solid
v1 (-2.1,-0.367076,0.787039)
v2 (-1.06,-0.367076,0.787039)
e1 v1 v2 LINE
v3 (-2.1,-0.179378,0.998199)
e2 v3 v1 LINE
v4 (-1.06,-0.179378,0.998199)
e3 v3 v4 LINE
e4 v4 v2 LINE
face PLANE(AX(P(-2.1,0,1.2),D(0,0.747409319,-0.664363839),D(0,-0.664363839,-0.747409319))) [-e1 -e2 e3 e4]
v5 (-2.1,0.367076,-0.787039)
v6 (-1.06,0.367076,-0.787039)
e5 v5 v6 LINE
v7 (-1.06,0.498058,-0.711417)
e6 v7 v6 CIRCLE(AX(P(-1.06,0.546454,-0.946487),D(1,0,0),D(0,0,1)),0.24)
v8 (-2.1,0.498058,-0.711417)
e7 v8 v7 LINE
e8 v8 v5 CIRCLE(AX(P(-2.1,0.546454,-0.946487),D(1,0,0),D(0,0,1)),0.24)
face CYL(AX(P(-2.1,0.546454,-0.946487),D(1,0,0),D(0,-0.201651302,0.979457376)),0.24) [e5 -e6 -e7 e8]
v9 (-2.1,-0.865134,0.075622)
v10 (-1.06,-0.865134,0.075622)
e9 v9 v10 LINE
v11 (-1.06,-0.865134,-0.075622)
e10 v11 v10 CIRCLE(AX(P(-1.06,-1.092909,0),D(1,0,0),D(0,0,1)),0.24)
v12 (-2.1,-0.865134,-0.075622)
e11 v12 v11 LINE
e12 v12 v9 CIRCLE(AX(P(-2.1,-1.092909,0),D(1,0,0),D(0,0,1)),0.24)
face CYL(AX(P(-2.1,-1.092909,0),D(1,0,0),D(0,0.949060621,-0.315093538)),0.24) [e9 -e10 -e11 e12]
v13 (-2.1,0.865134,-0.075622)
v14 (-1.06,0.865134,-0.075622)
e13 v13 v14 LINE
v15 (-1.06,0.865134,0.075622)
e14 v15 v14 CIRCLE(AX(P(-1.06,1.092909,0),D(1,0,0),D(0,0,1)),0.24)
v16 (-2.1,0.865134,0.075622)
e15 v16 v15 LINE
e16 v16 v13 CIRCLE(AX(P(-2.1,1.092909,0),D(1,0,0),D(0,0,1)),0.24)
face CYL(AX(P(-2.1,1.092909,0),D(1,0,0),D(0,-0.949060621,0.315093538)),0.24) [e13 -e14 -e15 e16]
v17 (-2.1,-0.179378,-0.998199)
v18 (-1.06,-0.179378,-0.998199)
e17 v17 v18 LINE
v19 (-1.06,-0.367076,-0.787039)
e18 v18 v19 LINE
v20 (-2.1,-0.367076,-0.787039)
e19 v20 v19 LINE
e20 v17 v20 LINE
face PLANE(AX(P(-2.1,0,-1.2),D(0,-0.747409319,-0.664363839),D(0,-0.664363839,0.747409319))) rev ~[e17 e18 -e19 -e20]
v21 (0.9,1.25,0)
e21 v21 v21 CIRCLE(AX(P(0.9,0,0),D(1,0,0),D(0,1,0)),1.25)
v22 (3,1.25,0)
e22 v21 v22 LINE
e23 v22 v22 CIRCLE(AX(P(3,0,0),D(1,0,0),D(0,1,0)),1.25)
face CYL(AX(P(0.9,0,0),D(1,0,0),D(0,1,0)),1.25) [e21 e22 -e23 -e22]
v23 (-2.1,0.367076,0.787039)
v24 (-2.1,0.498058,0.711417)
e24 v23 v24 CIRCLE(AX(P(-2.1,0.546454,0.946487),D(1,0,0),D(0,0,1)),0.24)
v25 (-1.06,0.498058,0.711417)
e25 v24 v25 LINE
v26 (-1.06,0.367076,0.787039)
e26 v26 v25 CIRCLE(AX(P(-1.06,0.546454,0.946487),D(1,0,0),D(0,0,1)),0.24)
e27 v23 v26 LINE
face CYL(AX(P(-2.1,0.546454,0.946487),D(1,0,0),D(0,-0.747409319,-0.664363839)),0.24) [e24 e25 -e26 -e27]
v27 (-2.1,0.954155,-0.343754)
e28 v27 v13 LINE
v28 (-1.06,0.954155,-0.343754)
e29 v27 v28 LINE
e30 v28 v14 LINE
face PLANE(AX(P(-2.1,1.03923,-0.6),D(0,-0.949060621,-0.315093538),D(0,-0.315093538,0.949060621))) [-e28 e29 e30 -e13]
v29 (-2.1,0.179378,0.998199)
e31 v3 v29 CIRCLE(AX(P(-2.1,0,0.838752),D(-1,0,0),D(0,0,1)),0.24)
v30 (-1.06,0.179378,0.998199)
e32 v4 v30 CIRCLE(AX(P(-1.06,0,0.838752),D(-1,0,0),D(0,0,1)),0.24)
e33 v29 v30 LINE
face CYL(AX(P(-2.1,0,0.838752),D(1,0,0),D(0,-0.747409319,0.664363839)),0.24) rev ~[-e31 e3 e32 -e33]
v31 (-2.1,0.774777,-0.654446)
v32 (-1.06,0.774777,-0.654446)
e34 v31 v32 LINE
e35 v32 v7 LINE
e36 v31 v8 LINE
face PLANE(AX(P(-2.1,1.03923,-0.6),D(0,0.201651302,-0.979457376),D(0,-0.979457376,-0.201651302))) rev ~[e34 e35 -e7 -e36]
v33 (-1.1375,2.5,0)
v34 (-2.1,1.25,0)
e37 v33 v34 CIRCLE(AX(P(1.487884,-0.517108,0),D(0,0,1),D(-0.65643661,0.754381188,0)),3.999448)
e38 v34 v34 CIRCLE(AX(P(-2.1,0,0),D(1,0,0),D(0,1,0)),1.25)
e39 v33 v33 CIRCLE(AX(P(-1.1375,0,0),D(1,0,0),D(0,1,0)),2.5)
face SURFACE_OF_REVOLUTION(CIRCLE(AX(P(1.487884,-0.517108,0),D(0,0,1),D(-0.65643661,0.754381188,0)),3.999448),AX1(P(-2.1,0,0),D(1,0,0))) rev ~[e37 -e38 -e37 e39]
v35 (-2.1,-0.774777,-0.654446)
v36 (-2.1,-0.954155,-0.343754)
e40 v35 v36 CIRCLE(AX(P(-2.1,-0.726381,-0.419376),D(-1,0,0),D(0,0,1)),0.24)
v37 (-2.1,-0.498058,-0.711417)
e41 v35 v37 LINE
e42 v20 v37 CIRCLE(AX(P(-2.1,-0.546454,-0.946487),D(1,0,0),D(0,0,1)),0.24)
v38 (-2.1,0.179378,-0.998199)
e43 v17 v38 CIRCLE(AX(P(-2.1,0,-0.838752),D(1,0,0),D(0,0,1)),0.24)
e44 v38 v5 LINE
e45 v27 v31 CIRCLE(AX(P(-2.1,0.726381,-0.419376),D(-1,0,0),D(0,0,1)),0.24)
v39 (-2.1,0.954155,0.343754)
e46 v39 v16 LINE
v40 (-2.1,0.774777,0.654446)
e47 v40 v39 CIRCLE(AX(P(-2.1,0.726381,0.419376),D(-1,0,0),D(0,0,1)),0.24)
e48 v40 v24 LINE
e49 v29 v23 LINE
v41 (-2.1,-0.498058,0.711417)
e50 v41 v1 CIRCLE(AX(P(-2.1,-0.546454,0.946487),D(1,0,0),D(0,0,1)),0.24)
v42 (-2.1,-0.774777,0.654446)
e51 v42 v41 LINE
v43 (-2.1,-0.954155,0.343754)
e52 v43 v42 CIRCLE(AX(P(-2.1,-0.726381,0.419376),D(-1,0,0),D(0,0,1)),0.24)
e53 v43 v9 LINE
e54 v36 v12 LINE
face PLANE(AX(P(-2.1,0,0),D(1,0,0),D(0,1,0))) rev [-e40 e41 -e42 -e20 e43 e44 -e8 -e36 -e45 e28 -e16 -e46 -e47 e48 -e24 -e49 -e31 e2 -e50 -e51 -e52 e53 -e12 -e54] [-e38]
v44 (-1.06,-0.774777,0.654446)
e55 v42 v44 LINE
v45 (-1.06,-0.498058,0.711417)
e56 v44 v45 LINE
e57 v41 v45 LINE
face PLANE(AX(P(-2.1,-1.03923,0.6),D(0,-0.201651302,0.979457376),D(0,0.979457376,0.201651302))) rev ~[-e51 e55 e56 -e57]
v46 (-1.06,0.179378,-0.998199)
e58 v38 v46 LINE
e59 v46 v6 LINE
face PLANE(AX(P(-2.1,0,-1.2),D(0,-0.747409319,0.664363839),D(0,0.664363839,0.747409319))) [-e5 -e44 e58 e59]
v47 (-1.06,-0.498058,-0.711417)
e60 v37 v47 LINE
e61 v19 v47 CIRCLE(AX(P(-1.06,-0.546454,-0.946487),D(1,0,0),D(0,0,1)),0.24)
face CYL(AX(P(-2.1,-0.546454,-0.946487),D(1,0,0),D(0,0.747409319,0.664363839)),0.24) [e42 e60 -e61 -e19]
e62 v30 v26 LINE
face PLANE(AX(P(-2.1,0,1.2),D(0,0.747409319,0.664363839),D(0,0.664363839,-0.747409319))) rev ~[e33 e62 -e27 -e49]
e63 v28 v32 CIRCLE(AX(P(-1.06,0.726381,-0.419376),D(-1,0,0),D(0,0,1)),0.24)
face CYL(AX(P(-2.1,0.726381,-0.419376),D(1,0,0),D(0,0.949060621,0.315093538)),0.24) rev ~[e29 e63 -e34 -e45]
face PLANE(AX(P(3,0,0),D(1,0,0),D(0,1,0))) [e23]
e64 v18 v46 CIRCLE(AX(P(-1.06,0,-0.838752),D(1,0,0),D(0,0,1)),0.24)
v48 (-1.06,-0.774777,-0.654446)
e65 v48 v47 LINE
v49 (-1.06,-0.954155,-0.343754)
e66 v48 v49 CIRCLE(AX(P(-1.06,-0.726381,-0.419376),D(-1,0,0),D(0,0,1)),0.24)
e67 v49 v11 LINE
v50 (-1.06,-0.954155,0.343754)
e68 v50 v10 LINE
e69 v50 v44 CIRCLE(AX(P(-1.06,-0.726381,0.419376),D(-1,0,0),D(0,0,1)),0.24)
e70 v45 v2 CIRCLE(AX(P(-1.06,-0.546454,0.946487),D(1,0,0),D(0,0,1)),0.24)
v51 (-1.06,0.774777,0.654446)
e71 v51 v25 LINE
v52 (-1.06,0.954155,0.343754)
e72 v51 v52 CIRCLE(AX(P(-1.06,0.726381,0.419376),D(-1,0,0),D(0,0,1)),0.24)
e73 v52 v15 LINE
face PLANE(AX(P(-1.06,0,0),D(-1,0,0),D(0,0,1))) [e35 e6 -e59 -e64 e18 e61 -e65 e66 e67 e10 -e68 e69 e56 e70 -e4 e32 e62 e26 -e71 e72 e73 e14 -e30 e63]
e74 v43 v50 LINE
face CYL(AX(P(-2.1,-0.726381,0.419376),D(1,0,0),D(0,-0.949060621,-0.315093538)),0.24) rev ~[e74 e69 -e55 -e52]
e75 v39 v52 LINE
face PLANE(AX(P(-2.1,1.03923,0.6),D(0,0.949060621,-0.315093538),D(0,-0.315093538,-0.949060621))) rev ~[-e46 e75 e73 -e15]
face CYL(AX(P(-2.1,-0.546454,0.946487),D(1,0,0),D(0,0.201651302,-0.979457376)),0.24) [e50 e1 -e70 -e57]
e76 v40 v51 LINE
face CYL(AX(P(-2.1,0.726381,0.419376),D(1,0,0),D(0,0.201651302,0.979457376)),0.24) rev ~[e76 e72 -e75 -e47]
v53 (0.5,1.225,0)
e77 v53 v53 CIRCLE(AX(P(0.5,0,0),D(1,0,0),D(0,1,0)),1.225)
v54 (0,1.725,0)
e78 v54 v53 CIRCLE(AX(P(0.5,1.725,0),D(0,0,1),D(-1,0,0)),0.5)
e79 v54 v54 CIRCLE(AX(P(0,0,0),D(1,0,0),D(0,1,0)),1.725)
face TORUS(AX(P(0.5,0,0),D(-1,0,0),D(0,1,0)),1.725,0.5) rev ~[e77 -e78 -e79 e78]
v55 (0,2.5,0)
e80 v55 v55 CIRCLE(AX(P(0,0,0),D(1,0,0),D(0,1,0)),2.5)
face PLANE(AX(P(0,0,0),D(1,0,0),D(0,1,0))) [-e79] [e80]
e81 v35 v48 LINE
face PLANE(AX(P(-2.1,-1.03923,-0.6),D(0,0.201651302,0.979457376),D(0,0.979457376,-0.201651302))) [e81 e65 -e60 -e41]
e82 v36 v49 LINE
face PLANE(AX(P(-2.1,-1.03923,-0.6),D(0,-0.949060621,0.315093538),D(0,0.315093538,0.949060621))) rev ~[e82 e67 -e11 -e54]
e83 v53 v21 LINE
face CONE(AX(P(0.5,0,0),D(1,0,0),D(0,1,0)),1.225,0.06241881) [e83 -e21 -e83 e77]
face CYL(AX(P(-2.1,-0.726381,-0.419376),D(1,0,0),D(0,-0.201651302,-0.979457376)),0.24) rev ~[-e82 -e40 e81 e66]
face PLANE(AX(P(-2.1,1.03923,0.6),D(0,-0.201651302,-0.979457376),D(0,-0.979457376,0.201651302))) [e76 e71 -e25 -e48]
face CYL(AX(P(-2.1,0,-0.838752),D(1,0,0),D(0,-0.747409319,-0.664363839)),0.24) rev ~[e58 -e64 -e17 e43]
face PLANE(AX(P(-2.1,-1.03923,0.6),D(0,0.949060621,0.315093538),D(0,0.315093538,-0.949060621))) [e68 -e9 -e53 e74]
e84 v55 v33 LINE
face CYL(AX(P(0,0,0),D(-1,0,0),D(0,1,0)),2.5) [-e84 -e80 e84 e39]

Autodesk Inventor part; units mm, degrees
ref_plane "YZ Plane" through (0, 0, 0) normal (1, 0, 0) x (0, 1, 0)
ref_plane "XZ Plane" through (0, 0, 0) normal (0, 1, 0) x (-1, 0, 0)
ref_plane "XY Plane" through (0, 0, 0) normal (0, 0, 1) x (1, 0, 0)
sketch "Sketch4" plane through (0, 0, 0) normal (0, 0, 1) x (1, 0, 0)
  line L0 (-2.1, 0) -> (3, 0)
  line L1 (0, 0) -> (-2.1, 0)
  line L2 (0, 2.5) -> (0, 1.725)
  line L3 (0.5, 1.225) -> (0.5, 1.225)
  line L4 (0.5, 1.225) -> (0.9, 1.25)
  arc A0 (0, 1.725) -> (0.5, 1.225) centre (0.5, 1.725) ccw
  line L5 (-2.1, 0) -> (-2.1, 1.25)
  line L6 (0, 2.5) -> (-1.1375, 2.5)
  arc A1 (-1.1375, 2.5) -> (-2.1, 1.25) centre (1.4883, -0.5175) ccw
  line L7 (0.9, 1.25) -> (3, 1.25)
  line L8 (3, 1.25) -> (3, 0)
  point P0 (0, 1.225)
  dimension "d71" = 0.5
  dimension "d72" = 3
  dimension "d74" = 0.4
  dimension "d75" = 2.45
  dimension "d78" = 2.5
  dimension "d82" = 4
  dimension "d83" = 2.1
  dimension "d84" = 5
  dimension "d104" = 2.1
  dimension "d105" = 2.5
revolve "Revolution7" add sketch "Sketch4" angle 360 about axis through (-2.1, 0, 0) along (1, 0, 0)
sketch "Sketch5" plane through (-2.1, 0, 0) normal (-1, 0, 0) x (0, 0, 1)
  circle A0 centre (0, 0) radius 1.2 construction
  circle A1 centre (0, 0) radius 0.84 construction
  line L0 (0, 0) -> (-0.7275, 0.42)
  line L1 (0, 0) -> (-0.7275, -0.42)
  line L2 (-1.8008, 0) -> (1.7887, 0)
  line L3 (-1.2, 0) -> (-0.7275, -0.42)
  line L4 (-1.2, 0) -> (-0.7275, 0.42)
  dimension "d88" = 2.4
  dimension "d89" = 1.68
  dimension "d90" = 30
  dimension "d91" = 30
extrude "Extrusion1" cut sketch "Sketch5" against normal blind 1.04
pattern_circular "Circular Pattern1" count 6 over 360 about axis through (-10, 0, 0) along (1, 0, 0) of "Extrusion1"
fillet "Fillet1" radius 0.24 12 edges at (-1.58, -1.0392, -0.6) (-1.58, -0.42, -0.7275) (-1.58, -0.84, 0) (-1.58, -1.0392, 0.6) (-1.58, -0.42, 0.7275) (-1.58, 0, 1.2) (-1.58, 0.84, 0) (-1.58, 1.0392, 0.6) (-1.58, 0.42, 0.7275) (-1.58, 0.42, -0.7275) (-1.58, 0, -1.2) (-1.58, 1.0392, -0.6)
thread "Thread7" size "M2.5x0.45" class "6g" standard "ISO Metric profile" length 2.1
properties part number "Flachkopfschraube mit Innenrund ISO 14583 - M2,5 x 3 - 4.8" material "Stahl"
